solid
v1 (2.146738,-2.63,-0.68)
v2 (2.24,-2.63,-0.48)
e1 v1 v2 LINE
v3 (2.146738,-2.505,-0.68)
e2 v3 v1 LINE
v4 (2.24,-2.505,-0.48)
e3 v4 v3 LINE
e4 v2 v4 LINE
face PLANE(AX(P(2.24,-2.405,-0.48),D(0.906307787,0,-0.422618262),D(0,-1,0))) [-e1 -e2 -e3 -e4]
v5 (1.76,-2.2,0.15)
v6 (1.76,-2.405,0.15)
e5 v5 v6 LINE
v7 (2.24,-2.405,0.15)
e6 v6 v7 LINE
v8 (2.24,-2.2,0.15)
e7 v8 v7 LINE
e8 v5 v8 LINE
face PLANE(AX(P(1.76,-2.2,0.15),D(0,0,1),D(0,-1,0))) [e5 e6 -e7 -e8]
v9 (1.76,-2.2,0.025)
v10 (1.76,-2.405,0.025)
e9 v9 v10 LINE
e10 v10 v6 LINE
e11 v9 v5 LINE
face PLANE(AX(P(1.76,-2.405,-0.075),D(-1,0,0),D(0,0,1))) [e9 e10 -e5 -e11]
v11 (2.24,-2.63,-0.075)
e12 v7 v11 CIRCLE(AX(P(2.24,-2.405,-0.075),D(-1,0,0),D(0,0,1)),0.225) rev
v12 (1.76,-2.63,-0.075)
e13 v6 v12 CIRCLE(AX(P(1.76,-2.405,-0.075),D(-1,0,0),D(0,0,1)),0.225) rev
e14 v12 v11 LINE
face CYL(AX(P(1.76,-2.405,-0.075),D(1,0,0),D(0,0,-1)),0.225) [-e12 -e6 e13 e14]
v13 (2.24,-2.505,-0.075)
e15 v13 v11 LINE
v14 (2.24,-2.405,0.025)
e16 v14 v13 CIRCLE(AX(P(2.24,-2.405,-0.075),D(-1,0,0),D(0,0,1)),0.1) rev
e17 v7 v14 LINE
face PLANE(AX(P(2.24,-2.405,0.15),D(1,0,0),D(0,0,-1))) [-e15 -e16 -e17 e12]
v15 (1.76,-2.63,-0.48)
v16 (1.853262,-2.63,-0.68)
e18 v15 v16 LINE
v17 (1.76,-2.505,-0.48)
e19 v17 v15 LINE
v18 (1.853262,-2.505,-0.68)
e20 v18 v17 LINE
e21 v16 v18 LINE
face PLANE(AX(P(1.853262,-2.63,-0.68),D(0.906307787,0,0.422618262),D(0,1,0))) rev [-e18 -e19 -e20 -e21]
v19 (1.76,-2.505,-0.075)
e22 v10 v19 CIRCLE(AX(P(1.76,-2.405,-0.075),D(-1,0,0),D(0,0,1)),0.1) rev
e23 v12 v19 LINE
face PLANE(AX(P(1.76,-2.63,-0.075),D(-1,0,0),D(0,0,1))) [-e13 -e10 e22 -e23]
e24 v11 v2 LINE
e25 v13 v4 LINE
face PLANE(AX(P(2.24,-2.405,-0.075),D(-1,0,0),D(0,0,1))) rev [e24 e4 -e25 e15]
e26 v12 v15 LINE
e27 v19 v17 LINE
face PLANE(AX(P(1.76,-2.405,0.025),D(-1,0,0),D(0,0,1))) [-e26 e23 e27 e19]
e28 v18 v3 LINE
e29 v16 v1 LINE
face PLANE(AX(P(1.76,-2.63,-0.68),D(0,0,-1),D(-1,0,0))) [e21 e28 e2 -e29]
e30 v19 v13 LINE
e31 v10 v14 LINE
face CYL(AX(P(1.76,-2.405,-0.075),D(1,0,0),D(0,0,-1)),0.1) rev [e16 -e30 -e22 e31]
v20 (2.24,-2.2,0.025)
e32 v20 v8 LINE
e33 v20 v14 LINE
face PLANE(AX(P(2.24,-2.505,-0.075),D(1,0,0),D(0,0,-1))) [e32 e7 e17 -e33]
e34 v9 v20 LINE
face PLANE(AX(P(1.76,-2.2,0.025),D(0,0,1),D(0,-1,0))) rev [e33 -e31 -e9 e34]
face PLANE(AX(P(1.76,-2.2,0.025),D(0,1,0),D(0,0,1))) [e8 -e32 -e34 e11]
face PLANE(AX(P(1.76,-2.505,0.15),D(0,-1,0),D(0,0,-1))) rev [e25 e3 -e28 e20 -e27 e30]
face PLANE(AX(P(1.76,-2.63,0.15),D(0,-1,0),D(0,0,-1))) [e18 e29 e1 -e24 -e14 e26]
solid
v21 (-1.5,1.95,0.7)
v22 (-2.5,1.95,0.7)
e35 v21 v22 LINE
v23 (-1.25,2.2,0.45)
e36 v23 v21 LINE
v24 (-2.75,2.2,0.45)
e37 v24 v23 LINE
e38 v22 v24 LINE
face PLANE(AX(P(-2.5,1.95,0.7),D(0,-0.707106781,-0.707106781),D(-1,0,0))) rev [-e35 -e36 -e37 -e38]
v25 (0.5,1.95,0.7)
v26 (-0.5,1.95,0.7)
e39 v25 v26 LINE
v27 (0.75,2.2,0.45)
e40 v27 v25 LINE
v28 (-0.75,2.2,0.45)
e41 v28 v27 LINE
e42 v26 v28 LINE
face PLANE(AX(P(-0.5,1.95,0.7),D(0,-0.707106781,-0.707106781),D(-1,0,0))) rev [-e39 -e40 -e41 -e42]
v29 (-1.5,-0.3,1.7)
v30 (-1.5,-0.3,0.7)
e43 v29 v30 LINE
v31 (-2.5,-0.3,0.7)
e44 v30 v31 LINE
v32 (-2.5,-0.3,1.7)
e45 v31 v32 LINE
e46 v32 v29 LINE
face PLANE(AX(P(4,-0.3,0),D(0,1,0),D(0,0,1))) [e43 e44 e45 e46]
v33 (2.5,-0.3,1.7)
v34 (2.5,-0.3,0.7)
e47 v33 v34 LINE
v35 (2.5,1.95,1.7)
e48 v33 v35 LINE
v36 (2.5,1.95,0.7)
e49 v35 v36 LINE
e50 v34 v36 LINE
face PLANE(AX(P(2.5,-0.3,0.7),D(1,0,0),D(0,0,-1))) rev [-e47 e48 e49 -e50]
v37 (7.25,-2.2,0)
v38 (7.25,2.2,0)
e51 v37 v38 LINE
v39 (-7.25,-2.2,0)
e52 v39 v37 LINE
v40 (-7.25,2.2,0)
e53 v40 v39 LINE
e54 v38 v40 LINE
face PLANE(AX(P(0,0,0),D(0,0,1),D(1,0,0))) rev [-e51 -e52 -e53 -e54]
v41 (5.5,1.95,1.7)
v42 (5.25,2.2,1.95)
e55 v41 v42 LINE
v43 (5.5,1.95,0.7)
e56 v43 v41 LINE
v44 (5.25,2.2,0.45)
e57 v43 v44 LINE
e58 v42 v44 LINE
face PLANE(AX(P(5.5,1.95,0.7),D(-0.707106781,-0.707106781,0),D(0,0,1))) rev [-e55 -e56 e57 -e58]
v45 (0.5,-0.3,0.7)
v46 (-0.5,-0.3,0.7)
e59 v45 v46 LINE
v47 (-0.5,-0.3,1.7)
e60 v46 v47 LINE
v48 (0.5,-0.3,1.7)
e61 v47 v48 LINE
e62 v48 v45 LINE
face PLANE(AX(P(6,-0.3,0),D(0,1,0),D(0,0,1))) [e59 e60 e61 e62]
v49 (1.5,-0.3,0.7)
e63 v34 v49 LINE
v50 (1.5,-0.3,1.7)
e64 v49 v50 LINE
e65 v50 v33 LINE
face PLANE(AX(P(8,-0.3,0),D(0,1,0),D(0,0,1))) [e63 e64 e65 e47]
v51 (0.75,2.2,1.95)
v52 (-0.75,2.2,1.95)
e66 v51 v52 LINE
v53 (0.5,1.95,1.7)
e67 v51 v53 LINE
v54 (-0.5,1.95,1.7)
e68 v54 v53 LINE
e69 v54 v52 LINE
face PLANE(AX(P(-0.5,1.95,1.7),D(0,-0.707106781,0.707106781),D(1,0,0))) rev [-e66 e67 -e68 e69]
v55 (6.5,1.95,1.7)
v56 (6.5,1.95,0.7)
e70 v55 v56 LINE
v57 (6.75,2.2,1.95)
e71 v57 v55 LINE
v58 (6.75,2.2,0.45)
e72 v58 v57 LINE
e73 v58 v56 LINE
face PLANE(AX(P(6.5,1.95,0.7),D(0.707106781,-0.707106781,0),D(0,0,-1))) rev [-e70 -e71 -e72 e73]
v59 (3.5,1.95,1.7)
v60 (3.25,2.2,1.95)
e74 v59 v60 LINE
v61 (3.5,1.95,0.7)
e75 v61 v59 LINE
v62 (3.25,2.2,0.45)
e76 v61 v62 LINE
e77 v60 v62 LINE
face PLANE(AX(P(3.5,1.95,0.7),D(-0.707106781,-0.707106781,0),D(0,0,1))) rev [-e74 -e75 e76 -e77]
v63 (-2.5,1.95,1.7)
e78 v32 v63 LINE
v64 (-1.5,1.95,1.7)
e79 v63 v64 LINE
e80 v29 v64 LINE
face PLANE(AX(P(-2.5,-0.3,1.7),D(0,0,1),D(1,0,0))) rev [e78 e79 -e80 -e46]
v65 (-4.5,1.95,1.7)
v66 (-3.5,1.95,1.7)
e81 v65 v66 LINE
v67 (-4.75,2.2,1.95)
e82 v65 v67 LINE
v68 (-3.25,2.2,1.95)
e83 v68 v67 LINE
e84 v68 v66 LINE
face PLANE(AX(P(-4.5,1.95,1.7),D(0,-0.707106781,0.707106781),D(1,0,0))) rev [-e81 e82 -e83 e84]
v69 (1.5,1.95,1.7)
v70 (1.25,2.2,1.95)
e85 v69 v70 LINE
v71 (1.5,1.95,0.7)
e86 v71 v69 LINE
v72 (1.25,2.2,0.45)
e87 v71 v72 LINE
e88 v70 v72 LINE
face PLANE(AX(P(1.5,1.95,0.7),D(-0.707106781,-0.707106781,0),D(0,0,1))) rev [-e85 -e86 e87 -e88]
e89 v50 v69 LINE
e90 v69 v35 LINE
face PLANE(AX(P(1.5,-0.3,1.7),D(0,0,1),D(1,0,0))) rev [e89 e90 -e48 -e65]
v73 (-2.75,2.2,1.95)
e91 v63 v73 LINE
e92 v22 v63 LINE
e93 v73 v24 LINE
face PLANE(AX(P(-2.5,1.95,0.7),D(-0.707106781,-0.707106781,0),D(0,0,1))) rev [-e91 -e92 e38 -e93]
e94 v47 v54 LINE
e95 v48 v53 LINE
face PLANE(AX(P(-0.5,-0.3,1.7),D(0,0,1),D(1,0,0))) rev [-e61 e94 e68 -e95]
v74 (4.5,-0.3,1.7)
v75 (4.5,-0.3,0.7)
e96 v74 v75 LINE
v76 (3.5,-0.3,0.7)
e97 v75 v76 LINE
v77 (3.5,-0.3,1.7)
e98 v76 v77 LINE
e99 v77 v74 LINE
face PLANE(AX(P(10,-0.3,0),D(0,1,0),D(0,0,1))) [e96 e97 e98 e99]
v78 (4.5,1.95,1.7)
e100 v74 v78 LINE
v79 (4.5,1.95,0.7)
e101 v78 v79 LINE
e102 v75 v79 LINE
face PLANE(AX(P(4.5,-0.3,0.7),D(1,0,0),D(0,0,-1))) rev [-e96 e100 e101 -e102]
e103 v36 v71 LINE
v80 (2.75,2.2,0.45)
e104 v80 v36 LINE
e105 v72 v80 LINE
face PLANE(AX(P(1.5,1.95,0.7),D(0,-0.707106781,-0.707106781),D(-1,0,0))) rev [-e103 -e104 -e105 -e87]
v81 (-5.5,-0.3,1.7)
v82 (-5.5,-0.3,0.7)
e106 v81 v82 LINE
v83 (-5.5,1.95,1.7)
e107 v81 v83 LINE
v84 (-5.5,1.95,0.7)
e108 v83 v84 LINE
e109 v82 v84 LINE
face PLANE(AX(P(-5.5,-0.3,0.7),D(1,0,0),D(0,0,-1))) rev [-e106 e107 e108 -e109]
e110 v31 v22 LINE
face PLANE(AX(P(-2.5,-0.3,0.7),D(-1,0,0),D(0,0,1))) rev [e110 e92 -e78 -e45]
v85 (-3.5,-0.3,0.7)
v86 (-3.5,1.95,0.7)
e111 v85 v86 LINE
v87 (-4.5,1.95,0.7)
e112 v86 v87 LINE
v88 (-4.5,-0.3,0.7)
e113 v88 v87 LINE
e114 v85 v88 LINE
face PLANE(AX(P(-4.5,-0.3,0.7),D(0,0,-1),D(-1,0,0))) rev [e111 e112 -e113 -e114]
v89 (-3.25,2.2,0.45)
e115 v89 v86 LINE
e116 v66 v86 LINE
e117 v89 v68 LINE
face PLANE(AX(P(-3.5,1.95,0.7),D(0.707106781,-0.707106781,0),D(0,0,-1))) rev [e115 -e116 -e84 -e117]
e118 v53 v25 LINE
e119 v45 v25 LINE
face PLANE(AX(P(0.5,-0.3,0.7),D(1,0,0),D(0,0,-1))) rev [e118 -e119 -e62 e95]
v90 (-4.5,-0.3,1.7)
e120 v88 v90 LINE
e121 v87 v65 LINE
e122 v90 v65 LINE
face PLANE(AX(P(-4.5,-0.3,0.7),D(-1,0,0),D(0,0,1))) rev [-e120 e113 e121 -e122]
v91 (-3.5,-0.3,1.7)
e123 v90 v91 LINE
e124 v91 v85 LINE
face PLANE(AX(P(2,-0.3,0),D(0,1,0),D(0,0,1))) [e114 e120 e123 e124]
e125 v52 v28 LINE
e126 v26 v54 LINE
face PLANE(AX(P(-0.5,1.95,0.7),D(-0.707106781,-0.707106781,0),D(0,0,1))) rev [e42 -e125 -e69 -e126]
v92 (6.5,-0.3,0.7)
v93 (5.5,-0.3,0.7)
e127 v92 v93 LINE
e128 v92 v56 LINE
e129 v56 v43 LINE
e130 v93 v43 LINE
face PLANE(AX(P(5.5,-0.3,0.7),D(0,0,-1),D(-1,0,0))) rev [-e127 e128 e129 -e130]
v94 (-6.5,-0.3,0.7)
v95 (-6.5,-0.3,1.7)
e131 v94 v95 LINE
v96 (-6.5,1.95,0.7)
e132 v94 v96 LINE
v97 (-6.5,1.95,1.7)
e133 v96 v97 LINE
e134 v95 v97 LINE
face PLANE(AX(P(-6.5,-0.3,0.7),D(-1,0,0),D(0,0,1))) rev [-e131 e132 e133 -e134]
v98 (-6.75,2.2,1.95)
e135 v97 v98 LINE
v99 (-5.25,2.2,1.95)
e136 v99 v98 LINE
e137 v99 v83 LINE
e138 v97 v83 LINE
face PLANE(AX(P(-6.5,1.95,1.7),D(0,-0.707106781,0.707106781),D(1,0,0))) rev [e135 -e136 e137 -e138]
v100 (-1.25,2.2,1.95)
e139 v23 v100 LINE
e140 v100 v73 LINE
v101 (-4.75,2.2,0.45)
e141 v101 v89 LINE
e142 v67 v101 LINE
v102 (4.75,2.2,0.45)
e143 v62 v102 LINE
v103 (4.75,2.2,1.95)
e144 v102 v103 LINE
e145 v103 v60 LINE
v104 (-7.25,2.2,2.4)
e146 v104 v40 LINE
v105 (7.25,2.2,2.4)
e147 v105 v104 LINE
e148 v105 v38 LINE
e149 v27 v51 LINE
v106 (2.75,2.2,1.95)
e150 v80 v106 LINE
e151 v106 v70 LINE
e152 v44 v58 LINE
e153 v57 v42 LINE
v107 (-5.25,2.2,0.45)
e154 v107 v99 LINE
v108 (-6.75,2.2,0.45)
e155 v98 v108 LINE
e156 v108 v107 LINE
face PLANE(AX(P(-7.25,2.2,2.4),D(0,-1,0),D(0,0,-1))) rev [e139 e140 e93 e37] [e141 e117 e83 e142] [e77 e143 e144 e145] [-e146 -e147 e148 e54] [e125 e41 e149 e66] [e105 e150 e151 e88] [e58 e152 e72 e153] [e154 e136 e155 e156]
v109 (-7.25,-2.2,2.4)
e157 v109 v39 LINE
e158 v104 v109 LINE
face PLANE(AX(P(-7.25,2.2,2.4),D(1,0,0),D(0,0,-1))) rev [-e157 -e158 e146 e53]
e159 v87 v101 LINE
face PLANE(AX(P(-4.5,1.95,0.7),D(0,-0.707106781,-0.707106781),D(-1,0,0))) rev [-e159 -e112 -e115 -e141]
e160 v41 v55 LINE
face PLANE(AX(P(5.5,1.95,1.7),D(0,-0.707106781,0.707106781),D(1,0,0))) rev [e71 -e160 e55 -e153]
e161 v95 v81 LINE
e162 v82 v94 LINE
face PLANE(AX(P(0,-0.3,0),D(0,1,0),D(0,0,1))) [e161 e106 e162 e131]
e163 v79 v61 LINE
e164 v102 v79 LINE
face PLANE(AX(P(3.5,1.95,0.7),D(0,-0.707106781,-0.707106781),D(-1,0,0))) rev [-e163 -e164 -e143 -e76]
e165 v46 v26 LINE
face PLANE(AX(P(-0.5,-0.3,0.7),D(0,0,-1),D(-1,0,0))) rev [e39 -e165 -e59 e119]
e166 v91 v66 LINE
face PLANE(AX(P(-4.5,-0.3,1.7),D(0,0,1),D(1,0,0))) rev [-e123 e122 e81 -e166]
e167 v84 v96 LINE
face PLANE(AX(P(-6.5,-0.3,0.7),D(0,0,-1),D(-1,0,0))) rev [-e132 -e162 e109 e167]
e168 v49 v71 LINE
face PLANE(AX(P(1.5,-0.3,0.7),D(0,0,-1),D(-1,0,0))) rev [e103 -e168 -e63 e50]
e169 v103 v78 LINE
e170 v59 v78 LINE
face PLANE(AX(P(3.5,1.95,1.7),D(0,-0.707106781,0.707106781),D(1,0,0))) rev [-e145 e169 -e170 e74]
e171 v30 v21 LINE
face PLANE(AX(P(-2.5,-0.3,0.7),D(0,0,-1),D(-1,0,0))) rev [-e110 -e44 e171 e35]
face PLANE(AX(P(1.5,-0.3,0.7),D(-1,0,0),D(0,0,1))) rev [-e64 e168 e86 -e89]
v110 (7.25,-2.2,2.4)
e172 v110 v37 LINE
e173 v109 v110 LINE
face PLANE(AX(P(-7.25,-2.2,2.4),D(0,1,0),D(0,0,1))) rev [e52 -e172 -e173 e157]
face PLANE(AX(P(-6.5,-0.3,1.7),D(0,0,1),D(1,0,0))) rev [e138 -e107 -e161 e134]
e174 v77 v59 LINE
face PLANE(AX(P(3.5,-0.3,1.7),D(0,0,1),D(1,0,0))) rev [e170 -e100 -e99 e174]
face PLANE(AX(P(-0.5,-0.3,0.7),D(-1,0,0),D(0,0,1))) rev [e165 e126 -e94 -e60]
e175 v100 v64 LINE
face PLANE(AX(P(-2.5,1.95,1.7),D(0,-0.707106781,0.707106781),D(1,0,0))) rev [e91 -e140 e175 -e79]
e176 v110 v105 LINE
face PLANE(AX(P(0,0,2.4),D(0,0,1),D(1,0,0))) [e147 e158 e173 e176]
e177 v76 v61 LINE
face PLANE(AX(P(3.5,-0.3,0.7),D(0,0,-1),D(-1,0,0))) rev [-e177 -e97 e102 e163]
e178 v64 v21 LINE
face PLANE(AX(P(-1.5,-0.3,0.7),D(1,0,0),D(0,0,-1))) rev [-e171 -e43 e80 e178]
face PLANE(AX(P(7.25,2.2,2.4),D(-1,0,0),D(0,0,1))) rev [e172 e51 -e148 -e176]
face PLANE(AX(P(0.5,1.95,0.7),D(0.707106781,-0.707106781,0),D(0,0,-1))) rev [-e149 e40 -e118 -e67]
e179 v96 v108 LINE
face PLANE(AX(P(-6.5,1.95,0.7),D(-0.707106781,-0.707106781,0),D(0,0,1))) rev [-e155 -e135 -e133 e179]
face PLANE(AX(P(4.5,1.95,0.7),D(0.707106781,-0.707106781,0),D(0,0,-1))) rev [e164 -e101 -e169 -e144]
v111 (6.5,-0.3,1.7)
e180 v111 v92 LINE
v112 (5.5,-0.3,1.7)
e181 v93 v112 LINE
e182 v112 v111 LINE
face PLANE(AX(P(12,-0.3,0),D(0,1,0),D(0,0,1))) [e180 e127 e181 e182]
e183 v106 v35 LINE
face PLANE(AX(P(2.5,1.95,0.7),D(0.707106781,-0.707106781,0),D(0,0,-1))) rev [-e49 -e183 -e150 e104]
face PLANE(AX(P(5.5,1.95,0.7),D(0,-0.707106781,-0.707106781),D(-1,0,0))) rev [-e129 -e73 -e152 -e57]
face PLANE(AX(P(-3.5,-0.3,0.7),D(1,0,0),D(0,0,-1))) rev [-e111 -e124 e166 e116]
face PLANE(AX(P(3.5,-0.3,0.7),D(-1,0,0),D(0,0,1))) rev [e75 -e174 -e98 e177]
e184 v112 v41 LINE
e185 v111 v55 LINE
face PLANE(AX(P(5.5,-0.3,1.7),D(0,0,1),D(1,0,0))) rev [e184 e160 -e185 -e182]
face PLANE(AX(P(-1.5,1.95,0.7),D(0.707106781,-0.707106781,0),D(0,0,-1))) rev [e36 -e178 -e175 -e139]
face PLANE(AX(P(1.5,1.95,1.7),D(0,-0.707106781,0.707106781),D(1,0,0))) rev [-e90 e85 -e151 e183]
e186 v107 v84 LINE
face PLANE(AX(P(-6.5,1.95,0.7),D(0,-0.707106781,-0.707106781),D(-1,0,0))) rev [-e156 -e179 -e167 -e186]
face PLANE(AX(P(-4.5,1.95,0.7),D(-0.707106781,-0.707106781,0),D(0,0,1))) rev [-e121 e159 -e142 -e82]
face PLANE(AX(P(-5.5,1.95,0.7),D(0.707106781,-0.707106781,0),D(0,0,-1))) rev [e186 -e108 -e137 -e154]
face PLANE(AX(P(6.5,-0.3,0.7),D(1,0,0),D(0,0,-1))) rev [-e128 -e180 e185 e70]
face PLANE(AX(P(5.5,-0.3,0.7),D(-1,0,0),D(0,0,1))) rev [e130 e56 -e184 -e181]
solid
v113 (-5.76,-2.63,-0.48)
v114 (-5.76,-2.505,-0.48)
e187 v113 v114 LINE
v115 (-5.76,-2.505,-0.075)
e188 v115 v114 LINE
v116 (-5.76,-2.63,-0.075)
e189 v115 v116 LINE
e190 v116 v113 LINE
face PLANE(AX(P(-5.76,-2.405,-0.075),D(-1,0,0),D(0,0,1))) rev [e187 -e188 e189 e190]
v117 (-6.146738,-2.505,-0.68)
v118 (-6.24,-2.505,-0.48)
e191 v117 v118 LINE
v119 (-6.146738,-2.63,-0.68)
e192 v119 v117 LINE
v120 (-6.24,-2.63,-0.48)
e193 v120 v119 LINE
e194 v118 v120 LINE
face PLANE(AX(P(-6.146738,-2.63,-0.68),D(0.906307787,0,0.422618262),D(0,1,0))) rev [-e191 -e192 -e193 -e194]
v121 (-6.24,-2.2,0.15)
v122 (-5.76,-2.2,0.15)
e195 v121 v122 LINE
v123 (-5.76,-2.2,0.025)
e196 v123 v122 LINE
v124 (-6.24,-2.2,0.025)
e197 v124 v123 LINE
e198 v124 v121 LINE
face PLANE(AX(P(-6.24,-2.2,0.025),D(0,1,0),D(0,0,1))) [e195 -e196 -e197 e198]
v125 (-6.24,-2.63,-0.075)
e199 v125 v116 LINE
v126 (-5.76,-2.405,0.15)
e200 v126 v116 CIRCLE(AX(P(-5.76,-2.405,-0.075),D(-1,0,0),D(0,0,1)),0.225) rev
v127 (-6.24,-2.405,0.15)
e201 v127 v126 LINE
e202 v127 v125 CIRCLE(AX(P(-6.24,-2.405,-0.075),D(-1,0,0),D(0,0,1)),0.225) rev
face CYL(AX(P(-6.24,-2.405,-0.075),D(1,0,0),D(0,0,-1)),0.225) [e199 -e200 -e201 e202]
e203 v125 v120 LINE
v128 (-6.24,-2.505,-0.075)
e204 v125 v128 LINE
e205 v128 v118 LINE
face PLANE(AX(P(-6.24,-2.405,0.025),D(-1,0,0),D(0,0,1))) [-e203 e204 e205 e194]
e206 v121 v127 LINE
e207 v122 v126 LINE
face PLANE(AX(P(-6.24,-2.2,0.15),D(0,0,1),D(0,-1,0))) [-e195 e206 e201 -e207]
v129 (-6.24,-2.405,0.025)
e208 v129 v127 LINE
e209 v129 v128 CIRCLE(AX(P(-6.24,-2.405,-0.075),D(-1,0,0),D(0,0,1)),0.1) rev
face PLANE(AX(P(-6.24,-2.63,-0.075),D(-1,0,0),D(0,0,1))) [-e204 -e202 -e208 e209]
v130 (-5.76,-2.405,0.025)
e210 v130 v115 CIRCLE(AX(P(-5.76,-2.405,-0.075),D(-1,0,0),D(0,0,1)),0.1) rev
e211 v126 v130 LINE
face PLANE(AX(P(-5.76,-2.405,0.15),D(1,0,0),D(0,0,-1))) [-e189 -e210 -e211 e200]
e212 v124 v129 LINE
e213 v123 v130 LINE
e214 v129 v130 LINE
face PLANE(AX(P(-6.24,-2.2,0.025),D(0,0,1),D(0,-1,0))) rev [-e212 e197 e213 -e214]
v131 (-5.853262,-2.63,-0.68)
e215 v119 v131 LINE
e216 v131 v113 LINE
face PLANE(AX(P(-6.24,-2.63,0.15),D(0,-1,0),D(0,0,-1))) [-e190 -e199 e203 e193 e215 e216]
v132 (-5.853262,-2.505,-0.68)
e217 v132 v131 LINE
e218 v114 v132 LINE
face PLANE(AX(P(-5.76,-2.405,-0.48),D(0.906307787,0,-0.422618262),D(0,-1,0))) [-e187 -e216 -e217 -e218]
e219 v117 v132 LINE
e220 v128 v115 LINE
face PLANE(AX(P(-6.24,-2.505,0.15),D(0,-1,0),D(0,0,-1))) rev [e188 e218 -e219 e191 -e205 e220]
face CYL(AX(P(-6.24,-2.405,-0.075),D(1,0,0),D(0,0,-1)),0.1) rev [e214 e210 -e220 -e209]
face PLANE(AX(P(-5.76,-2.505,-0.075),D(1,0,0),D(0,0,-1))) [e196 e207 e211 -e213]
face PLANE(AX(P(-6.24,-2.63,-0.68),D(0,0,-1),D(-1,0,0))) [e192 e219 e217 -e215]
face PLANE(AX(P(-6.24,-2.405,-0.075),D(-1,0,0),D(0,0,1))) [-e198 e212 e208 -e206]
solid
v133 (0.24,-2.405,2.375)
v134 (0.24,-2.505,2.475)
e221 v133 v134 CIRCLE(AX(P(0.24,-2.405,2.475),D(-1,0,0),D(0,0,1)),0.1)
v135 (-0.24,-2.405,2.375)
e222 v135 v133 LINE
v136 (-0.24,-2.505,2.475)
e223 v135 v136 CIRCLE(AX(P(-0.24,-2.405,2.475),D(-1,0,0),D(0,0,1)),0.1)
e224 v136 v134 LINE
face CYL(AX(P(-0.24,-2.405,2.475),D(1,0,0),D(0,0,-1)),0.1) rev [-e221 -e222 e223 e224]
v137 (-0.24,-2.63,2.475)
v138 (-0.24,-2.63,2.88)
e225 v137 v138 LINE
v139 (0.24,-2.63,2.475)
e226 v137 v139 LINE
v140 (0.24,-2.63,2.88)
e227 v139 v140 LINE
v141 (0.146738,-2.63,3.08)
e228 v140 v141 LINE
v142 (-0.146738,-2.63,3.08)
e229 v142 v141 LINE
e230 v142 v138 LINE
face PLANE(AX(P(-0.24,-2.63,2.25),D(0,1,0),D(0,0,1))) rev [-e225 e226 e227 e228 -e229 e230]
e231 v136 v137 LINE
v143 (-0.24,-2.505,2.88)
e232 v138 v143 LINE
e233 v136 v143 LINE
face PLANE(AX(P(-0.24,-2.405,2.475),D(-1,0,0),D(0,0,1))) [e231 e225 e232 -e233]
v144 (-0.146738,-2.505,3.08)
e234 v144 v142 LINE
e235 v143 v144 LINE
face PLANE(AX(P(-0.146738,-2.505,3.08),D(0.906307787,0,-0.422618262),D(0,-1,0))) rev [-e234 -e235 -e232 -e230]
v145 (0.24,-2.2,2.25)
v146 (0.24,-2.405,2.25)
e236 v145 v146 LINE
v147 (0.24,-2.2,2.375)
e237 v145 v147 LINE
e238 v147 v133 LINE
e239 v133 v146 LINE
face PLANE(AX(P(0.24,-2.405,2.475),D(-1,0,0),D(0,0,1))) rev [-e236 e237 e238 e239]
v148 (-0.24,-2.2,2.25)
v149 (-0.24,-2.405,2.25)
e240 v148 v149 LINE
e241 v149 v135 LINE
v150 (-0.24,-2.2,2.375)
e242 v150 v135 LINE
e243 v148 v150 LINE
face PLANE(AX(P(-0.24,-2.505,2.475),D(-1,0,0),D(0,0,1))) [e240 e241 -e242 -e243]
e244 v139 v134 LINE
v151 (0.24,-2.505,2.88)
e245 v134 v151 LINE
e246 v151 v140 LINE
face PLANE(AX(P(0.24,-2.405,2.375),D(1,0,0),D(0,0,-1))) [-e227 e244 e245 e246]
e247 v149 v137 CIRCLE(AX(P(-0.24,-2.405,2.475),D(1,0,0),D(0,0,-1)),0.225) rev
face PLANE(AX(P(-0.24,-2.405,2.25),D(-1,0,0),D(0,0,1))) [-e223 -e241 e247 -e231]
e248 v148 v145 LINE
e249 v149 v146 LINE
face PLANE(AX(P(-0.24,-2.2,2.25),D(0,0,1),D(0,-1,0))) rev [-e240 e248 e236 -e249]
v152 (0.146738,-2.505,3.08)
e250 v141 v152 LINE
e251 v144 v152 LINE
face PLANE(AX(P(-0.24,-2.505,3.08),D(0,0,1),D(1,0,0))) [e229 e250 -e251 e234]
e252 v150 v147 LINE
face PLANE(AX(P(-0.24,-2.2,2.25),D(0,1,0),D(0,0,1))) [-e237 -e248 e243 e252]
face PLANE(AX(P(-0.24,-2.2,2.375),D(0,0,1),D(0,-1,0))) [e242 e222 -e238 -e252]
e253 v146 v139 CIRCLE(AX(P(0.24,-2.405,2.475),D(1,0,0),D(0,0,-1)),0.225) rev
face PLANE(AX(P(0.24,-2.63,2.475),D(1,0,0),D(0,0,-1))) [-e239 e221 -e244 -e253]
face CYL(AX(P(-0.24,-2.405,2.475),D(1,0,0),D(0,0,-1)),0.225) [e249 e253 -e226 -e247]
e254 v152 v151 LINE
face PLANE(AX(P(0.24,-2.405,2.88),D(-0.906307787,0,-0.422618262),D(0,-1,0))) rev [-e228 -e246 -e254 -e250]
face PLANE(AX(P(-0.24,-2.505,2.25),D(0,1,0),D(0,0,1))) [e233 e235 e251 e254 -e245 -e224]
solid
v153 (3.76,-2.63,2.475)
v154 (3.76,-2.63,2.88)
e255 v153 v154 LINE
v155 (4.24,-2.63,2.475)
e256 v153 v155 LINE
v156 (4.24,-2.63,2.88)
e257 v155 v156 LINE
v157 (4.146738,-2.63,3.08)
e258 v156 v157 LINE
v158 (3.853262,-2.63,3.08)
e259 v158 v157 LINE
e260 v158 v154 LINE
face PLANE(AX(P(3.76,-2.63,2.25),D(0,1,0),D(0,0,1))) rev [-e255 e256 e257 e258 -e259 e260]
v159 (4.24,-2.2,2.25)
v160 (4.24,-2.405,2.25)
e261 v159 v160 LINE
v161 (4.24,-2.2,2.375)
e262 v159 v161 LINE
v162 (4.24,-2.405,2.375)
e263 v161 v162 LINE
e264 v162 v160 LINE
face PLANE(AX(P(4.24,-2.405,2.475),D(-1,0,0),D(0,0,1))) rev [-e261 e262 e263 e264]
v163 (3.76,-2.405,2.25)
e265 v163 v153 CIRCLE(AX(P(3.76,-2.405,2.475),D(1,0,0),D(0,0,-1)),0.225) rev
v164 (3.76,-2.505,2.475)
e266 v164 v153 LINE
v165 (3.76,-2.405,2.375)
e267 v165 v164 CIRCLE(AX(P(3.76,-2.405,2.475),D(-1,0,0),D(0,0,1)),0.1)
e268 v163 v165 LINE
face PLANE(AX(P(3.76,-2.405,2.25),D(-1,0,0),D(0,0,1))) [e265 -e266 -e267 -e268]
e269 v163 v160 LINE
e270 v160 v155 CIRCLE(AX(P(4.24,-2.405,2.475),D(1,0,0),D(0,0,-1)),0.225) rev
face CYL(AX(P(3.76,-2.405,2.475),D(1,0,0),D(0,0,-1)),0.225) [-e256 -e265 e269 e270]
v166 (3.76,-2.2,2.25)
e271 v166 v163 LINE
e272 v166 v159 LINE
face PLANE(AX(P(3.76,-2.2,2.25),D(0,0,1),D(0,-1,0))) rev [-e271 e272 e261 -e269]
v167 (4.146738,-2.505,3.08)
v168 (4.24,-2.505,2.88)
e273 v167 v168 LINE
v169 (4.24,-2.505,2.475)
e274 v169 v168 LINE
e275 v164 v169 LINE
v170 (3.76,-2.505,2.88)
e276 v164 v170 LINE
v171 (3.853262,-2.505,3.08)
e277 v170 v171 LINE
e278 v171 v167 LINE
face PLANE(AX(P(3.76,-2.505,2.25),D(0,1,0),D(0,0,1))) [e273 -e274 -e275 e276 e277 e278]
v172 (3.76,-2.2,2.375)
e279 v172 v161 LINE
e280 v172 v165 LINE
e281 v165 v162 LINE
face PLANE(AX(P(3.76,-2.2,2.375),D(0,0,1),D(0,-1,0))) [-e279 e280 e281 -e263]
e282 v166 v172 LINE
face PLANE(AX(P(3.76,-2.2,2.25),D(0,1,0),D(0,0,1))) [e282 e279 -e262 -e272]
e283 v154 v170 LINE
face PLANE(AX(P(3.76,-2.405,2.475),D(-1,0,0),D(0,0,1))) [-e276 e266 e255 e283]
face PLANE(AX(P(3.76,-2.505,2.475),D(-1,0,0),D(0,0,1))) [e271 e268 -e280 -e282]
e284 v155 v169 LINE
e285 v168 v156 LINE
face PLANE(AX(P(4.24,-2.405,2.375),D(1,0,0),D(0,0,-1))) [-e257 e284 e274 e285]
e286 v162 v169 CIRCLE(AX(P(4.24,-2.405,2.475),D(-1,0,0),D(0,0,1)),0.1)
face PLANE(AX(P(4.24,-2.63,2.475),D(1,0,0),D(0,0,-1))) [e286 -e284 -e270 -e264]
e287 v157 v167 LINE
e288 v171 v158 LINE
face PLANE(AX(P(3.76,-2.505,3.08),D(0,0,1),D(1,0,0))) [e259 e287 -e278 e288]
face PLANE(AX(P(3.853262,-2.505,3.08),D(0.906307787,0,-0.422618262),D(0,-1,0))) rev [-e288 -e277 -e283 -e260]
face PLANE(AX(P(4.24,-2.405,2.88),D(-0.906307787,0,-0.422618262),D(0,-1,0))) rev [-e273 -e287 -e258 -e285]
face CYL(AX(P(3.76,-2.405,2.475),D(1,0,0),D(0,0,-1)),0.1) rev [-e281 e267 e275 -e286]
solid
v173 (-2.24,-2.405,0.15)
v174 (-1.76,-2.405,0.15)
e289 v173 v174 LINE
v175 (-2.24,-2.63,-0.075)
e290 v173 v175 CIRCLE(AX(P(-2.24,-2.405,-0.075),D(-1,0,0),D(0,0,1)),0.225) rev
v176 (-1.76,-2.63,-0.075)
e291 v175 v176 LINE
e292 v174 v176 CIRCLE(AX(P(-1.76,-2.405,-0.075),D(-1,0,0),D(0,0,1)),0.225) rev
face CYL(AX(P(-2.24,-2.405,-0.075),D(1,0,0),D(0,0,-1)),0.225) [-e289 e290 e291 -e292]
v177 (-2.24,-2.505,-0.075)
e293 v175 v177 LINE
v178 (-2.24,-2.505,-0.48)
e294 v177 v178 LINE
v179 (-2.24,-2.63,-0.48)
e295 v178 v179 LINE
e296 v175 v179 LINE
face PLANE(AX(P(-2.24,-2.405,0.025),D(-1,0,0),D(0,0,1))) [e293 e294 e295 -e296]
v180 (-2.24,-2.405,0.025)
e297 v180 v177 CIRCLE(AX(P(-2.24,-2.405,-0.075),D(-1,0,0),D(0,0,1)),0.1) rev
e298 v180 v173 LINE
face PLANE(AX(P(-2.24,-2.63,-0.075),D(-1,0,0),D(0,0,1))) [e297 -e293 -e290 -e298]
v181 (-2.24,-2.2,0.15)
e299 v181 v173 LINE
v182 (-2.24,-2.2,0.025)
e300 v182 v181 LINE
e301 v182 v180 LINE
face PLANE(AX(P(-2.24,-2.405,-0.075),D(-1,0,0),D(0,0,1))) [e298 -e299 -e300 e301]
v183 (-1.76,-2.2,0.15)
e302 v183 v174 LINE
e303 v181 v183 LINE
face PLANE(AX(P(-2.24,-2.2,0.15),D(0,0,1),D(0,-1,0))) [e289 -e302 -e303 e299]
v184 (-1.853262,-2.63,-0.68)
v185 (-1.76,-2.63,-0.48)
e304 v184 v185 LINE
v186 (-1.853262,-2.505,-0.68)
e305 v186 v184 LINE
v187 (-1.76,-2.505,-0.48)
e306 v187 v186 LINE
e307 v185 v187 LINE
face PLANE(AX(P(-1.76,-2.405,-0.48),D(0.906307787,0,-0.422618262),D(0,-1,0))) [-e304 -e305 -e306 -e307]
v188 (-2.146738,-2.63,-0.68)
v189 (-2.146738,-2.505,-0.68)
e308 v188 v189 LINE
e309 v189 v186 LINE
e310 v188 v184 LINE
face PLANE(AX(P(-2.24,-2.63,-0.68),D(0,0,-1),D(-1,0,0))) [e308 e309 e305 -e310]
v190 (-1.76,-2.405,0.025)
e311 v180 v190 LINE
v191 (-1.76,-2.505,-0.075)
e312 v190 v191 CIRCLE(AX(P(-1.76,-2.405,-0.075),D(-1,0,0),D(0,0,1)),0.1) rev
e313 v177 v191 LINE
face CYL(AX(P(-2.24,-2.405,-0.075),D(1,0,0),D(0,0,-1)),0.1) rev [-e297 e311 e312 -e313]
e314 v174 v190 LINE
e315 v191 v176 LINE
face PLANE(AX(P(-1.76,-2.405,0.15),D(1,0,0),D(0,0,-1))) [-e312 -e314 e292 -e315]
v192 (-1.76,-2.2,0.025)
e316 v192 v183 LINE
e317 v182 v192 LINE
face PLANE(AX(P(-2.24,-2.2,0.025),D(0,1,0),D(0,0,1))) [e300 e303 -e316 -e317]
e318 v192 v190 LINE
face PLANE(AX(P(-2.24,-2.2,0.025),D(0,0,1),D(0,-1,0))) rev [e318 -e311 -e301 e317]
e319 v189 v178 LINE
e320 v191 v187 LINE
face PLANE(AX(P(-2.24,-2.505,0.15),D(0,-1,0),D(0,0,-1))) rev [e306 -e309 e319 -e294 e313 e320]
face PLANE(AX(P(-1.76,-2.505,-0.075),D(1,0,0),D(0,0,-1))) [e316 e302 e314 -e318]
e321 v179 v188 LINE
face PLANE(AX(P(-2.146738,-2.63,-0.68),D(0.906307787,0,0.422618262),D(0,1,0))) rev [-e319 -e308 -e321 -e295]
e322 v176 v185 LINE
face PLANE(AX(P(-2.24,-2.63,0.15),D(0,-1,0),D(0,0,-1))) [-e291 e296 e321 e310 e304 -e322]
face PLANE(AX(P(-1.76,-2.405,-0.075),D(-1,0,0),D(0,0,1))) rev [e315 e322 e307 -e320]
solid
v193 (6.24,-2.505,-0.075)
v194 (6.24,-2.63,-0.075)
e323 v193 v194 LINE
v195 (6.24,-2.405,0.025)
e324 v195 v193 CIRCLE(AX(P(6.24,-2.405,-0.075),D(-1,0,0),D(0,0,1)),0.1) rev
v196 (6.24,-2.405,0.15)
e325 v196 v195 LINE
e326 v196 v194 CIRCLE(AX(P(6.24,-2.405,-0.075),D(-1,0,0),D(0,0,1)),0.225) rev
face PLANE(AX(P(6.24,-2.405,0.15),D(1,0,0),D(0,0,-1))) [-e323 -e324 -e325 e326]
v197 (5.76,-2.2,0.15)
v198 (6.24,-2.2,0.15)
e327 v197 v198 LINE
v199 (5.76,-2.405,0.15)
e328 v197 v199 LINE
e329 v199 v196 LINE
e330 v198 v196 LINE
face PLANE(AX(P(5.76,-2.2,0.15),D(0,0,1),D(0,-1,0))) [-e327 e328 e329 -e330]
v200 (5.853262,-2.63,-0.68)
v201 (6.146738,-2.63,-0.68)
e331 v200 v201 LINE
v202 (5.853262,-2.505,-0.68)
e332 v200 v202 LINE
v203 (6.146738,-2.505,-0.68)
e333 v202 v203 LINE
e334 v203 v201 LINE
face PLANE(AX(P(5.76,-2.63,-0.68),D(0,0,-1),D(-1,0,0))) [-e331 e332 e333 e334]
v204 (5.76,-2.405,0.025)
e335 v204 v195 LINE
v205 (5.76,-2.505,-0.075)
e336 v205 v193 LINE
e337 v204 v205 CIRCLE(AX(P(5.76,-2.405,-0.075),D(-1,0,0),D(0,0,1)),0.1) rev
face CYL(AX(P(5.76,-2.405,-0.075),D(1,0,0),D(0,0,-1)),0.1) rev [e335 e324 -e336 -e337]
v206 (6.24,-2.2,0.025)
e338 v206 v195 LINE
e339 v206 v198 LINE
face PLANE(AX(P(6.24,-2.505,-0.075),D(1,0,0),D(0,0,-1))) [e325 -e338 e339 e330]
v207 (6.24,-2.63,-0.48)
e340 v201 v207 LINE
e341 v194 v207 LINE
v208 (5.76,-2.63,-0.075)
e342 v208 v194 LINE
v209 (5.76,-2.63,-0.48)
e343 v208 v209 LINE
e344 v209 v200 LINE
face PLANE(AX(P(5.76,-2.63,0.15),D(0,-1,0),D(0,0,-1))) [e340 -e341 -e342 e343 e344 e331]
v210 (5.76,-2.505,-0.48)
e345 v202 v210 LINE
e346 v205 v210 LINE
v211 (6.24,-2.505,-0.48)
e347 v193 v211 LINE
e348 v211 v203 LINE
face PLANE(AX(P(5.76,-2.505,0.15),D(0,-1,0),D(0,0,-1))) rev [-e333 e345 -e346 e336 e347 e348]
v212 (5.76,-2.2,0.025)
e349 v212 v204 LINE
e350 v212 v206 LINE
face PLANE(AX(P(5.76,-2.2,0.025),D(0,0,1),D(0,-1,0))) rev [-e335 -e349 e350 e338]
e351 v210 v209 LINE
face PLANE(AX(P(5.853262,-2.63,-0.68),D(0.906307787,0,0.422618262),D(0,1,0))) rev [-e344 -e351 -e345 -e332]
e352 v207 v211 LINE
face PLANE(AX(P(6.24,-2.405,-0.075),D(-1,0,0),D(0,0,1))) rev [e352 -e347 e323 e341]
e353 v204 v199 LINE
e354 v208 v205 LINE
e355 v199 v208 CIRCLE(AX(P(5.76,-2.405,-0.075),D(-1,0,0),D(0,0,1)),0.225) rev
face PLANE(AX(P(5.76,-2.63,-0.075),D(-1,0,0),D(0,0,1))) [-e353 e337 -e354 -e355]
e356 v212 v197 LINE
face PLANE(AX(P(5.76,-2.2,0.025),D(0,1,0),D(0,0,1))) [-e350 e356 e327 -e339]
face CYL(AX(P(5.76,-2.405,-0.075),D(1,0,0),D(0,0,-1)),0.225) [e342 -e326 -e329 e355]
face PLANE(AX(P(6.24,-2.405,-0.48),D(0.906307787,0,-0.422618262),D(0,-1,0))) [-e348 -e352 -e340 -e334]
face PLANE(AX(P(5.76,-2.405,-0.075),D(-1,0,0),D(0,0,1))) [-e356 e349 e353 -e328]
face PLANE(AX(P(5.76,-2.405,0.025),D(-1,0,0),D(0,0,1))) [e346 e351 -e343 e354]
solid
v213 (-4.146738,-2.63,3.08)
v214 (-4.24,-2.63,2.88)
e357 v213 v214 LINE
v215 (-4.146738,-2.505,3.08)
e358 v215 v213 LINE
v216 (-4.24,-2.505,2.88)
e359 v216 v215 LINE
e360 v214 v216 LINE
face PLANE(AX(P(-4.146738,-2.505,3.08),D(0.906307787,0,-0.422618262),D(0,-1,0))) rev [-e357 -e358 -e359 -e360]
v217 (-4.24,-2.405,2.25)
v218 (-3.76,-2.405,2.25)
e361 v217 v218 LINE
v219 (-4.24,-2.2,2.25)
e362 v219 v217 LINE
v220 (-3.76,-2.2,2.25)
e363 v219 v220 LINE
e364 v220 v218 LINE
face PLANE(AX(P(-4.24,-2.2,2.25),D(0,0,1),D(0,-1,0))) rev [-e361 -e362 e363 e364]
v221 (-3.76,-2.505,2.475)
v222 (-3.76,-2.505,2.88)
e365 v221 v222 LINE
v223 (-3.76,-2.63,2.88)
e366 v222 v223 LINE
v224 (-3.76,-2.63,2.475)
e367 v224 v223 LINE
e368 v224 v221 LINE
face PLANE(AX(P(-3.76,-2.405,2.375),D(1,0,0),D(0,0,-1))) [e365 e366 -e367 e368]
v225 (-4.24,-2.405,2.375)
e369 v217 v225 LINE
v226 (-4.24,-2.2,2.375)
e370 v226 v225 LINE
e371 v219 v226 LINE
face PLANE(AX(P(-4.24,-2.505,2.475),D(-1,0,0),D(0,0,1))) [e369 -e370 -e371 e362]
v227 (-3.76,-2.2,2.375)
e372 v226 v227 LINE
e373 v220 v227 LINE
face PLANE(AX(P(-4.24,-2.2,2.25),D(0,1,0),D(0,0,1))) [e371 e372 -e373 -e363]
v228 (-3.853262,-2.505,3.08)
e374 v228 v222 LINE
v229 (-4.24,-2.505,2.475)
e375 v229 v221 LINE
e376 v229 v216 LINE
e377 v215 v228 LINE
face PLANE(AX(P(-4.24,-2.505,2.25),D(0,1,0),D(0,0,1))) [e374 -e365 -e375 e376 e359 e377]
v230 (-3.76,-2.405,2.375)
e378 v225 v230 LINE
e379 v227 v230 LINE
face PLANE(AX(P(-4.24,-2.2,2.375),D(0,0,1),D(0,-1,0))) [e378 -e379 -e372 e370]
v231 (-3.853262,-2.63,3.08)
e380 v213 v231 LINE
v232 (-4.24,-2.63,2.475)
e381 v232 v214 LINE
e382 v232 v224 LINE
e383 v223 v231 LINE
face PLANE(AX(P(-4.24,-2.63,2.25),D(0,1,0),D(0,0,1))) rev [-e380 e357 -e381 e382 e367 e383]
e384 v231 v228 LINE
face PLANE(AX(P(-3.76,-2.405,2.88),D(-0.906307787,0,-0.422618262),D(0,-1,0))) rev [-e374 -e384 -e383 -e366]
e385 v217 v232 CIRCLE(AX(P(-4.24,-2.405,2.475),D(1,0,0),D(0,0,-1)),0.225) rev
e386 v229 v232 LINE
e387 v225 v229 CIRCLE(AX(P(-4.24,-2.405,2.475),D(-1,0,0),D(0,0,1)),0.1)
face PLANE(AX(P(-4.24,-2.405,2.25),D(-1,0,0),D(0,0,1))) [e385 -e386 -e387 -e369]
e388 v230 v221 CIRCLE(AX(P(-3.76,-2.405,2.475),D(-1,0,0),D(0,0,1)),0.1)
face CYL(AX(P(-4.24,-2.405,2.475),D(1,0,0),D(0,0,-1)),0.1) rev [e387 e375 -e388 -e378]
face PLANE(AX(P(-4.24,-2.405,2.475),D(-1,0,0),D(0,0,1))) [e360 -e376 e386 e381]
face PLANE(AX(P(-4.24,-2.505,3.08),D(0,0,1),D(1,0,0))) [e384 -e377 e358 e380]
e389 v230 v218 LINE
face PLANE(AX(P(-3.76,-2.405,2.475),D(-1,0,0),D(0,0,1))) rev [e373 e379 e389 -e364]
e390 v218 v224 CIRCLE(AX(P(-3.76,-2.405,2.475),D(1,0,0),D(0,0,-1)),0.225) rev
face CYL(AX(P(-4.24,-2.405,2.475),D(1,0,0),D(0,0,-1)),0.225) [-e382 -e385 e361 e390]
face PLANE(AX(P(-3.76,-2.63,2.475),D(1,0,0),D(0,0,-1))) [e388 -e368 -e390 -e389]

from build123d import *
from OCP.BRepFilletAPI import BRepFilletAPI_MakeChamfer

# Parameters (mm, degrees)
SKETCH1_W                  = 14.5
SKETCH1_H                  = 4.4
BOSS_EXTRUDE1_DEPTH        = 2.4
SKETCH2_W                  = 1
SKETCH2_H                  = 1
CUT_EXTRUDE1_DEPTH         = 2.5
CHAMFER1_SIZE              = 0.25
LPATTERN6_COUNT            = 7
LPATTERN6_PITCH            = 2
CHAMFER1_OF_LPATTERN6_SIZE = 0.25
BASE_FLANGE2_DEPTH         = 0.24
BASE_FLANGE2_DEPTH_BACK    = 0.24
BASE_FLANGE3_DEPTH         = 0.24
BASE_FLANGE3_DEPTH_BACK    = 0.24
CHAMFER3_SIZE              = 0.2
CHAMFER3_SIZE2             = 0.093261532
CHAMFER4_SIZE              = 0.2
CHAMFER4_SIZE2             = 0.093261532
LPATTERN4_COUNT            = 4
LPATTERN4_PITCH            = 4
LPATTERN3_COUNT            = 3
LPATTERN3_PITCH            = 4


# Sheet-metal steps are written as plain solids
with BuildPart() as part:
    # Sketch1 → Boss-Extrude1 (new body)
    with BuildSketch(Plane.XY):
        Rectangle(SKETCH1_W, SKETCH1_H)
    extrude(amount=BOSS_EXTRUDE1_DEPTH)

    # Sketch2 → Cut-Extrude1 (cut)
    with BuildSketch(Plane(origin=(0, 2.2, 0), x_dir=(1, 0, 0), z_dir=(0, 1, 0))):
        with Locations((-6, -1.2)):
            Rectangle(SKETCH2_W, SKETCH2_H)
    cut_extrude1 = extrude(amount=-CUT_EXTRUDE1_DEPTH, mode=Mode.SUBTRACT)

    # Chamfer1
    chamfer1_edges = [part.edges().sort_by_distance(p)[0] for p in [
        (-5.5, 2.2, 1.2),
        (-6, 2.2, 0.7),
        (-6.5, 2.2, 1.2),
        (-6, 2.2, 1.7),
    ]]
    chamfer(chamfer1_edges, length=CHAMFER1_SIZE)

    # LPattern6: Cut-Extrude1 ×7
    with Locations(*[(i * LPATTERN6_PITCH, 0, 0) for i in range(1, LPATTERN6_COUNT)]):
        add(cut_extrude1, mode=Mode.SUBTRACT)

    # Chamfer1 of LPattern6
    chamfer1_of_lpattern6_edges = [part.edges().sort_by_distance(p)[0] for p in [
        (-3.5, 2.2, 1.2),
        (-4, 2.2, 0.7),
        (-4.5, 2.2, 1.2),
        (-4, 2.2, 1.7),
        (-1.5, 2.2, 1.2),
        (-2, 2.2, 0.7),
        (-2.5, 2.2, 1.2),
        (-2, 2.2, 1.7),
        (0.5, 2.2, 1.2),
        (0, 2.2, 0.7),
        (-0.5, 2.2, 1.2),
        (0, 2.2, 1.7),
        (2.5, 2.2, 1.2),
        (2, 2.2, 0.7),
        (1.5, 2.2, 1.2),
        (2, 2.2, 1.7),
        (4.5, 2.2, 1.2),
        (4, 2.2, 0.7),
        (3.5, 2.2, 1.2),
        (4, 2.2, 1.7),
        (6.5, 2.2, 1.2),
        (6, 2.2, 0.7),
        (5.5, 2.2, 1.2),
        (6, 2.2, 1.7),
    ]]
    chamfer(chamfer1_of_lpattern6_edges, length=CHAMFER1_OF_LPATTERN6_SIZE)


with BuildPart() as body_2:
    # Sketch5 → Base-Flange2 (new, two sides: drawn at the far end of the back side and taken through both)
    with BuildSketch(Plane.ZY.offset(6).offset(-BASE_FLANGE2_DEPTH_BACK)):
        with BuildLine():
            Line((0.15, -2.2), (0.15, -2.405))
            ThreePointArc((0.15, -2.405), (0.084099026, -2.564099026), (-0.075, -2.63))
            Line((-0.075, -2.63), (-0.68, -2.63))
            Line((-0.68, -2.63), (-0.68, -2.505))
            Line((-0.68, -2.505), (-0.075, -2.505))
            ThreePointArc((-0.075, -2.505), (-0.004289322, -2.475710678), (0.025, -2.405))
            Line((0.025, -2.405), (0.025, -2.2))
            Line((0.025, -2.2), (0.15, -2.2))
        make_face()
    extrude(amount=BASE_FLANGE2_DEPTH + BASE_FLANGE2_DEPTH_BACK)

    # Chamfer4: one chamfer whose edges measure the first distance from different faces: ONE call of the kernel's chamfer builder (chamfer() names one face for all edges)
    chamfer4_edges_1 = [body_2.edges().sort_by_distance(p)[0] for p in [
        (-5.76, -2.5675, -0.68),
    ]]
    chamfer4_side_1 = [body_2.faces().sort_by_distance(p)[0] for p in [
        (-5.76, -2.3025, 0.034347727),
    ]]
    chamfer4_edges_2 = [body_2.edges().sort_by_distance(p)[0] for p in [
        (-6.24, -2.5675, -0.68),
    ]]
    chamfer4_side_2 = [body_2.faces().sort_by_distance(p)[0] for p in [
        (-6.24, -2.3025, 0.034347727),
    ]]
    chamfer4 = BRepFilletAPI_MakeChamfer(body_2.part.solid().wrapped)
    for e in chamfer4_edges_1:
        chamfer4.Add(CHAMFER4_SIZE, CHAMFER4_SIZE2, e.wrapped, chamfer4_side_1[0].wrapped)  # the first distance lies on this face
    for e in chamfer4_edges_2:
        chamfer4.Add(CHAMFER4_SIZE, CHAMFER4_SIZE2, e.wrapped, chamfer4_side_2[0].wrapped)  # the first distance lies on this face
    add(Compound.cast(chamfer4.Shape()), mode=Mode.REPLACE)


with BuildPart() as body_3:
    # Sketch22 → Base-Flange3 (new, two sides: drawn at the far end of the back side and taken through both)
    with BuildSketch(Plane.ZY.offset(4).offset(-BASE_FLANGE3_DEPTH_BACK)):
        with BuildLine():
            Line((2.25, -2.2), (2.25, -2.405))
            ThreePointArc((2.25, -2.405), (2.315900974, -2.564099026), (2.475, -2.63))
            Line((2.475, -2.63), (3.08, -2.63))
            Line((3.08, -2.63), (3.08, -2.505))
            Line((3.08, -2.505), (2.475, -2.505))
            ThreePointArc((2.475, -2.505), (2.404289322, -2.475710678), (2.375, -2.405))
            Line((2.375, -2.405), (2.375, -2.2))
            Line((2.375, -2.2), (2.25, -2.2))
        make_face()
    extrude(amount=BASE_FLANGE3_DEPTH + BASE_FLANGE3_DEPTH_BACK)

    # Chamfer3: one chamfer whose edges measure the first distance from different faces: ONE call of the kernel's chamfer builder (chamfer() names one face for all edges)
    chamfer3_edges_1 = [body_3.edges().sort_by_distance(p)[0] for p in [
        (-3.76, -2.5675, 3.08),
    ]]
    chamfer3_side_1 = [body_3.faces().sort_by_distance(p)[0] for p in [
        (-3.76, -2.3025, 2.365652273),
    ]]
    chamfer3_edges_2 = [body_3.edges().sort_by_distance(p)[0] for p in [
        (-4.24, -2.5675, 3.08),
    ]]
    chamfer3_side_2 = [body_3.faces().sort_by_distance(p)[0] for p in [
        (-4.24, -2.3025, 2.365652273),
    ]]
    chamfer3 = BRepFilletAPI_MakeChamfer(body_3.part.solid().wrapped)
    for e in chamfer3_edges_1:
        chamfer3.Add(CHAMFER3_SIZE, CHAMFER3_SIZE2, e.wrapped, chamfer3_side_1[0].wrapped)  # the first distance lies on this face
    for e in chamfer3_edges_2:
        chamfer3.Add(CHAMFER3_SIZE, CHAMFER3_SIZE2, e.wrapped, chamfer3_side_2[0].wrapped)  # the first distance lies on this face
    add(Compound.cast(chamfer3.Shape()), mode=Mode.REPLACE)


with BuildPart() as lpattern4_1:
    # LPattern4: pattern copy
    add(body_2.part.moved(Location(Vector(1, 0, 0) * (1 * LPATTERN4_PITCH))))


with BuildPart() as lpattern4_2:
    # LPattern4: pattern copy
    add(body_2.part.moved(Location(Vector(1, 0, 0) * (2 * LPATTERN4_PITCH))))


with BuildPart() as lpattern4_3:
    # LPattern4: pattern copy
    add(body_2.part.moved(Location(Vector(1, 0, 0) * (3 * LPATTERN4_PITCH))))


with BuildPart() as lpattern3_1:
    # LPattern3: pattern copy
    add(body_3.part.moved(Location(Vector(1, 0, 0) * (1 * LPATTERN3_PITCH))))


with BuildPart() as lpattern3_2:
    # LPattern3: pattern copy
    add(body_3.part.moved(Location(Vector(1, 0, 0) * (2 * LPATTERN3_PITCH))))


solid = Compound([part.part, body_2.part, body_3.part, lpattern4_1.part, lpattern4_2.part, lpattern4_3.part, lpattern3_1.part, lpattern3_2.part])
